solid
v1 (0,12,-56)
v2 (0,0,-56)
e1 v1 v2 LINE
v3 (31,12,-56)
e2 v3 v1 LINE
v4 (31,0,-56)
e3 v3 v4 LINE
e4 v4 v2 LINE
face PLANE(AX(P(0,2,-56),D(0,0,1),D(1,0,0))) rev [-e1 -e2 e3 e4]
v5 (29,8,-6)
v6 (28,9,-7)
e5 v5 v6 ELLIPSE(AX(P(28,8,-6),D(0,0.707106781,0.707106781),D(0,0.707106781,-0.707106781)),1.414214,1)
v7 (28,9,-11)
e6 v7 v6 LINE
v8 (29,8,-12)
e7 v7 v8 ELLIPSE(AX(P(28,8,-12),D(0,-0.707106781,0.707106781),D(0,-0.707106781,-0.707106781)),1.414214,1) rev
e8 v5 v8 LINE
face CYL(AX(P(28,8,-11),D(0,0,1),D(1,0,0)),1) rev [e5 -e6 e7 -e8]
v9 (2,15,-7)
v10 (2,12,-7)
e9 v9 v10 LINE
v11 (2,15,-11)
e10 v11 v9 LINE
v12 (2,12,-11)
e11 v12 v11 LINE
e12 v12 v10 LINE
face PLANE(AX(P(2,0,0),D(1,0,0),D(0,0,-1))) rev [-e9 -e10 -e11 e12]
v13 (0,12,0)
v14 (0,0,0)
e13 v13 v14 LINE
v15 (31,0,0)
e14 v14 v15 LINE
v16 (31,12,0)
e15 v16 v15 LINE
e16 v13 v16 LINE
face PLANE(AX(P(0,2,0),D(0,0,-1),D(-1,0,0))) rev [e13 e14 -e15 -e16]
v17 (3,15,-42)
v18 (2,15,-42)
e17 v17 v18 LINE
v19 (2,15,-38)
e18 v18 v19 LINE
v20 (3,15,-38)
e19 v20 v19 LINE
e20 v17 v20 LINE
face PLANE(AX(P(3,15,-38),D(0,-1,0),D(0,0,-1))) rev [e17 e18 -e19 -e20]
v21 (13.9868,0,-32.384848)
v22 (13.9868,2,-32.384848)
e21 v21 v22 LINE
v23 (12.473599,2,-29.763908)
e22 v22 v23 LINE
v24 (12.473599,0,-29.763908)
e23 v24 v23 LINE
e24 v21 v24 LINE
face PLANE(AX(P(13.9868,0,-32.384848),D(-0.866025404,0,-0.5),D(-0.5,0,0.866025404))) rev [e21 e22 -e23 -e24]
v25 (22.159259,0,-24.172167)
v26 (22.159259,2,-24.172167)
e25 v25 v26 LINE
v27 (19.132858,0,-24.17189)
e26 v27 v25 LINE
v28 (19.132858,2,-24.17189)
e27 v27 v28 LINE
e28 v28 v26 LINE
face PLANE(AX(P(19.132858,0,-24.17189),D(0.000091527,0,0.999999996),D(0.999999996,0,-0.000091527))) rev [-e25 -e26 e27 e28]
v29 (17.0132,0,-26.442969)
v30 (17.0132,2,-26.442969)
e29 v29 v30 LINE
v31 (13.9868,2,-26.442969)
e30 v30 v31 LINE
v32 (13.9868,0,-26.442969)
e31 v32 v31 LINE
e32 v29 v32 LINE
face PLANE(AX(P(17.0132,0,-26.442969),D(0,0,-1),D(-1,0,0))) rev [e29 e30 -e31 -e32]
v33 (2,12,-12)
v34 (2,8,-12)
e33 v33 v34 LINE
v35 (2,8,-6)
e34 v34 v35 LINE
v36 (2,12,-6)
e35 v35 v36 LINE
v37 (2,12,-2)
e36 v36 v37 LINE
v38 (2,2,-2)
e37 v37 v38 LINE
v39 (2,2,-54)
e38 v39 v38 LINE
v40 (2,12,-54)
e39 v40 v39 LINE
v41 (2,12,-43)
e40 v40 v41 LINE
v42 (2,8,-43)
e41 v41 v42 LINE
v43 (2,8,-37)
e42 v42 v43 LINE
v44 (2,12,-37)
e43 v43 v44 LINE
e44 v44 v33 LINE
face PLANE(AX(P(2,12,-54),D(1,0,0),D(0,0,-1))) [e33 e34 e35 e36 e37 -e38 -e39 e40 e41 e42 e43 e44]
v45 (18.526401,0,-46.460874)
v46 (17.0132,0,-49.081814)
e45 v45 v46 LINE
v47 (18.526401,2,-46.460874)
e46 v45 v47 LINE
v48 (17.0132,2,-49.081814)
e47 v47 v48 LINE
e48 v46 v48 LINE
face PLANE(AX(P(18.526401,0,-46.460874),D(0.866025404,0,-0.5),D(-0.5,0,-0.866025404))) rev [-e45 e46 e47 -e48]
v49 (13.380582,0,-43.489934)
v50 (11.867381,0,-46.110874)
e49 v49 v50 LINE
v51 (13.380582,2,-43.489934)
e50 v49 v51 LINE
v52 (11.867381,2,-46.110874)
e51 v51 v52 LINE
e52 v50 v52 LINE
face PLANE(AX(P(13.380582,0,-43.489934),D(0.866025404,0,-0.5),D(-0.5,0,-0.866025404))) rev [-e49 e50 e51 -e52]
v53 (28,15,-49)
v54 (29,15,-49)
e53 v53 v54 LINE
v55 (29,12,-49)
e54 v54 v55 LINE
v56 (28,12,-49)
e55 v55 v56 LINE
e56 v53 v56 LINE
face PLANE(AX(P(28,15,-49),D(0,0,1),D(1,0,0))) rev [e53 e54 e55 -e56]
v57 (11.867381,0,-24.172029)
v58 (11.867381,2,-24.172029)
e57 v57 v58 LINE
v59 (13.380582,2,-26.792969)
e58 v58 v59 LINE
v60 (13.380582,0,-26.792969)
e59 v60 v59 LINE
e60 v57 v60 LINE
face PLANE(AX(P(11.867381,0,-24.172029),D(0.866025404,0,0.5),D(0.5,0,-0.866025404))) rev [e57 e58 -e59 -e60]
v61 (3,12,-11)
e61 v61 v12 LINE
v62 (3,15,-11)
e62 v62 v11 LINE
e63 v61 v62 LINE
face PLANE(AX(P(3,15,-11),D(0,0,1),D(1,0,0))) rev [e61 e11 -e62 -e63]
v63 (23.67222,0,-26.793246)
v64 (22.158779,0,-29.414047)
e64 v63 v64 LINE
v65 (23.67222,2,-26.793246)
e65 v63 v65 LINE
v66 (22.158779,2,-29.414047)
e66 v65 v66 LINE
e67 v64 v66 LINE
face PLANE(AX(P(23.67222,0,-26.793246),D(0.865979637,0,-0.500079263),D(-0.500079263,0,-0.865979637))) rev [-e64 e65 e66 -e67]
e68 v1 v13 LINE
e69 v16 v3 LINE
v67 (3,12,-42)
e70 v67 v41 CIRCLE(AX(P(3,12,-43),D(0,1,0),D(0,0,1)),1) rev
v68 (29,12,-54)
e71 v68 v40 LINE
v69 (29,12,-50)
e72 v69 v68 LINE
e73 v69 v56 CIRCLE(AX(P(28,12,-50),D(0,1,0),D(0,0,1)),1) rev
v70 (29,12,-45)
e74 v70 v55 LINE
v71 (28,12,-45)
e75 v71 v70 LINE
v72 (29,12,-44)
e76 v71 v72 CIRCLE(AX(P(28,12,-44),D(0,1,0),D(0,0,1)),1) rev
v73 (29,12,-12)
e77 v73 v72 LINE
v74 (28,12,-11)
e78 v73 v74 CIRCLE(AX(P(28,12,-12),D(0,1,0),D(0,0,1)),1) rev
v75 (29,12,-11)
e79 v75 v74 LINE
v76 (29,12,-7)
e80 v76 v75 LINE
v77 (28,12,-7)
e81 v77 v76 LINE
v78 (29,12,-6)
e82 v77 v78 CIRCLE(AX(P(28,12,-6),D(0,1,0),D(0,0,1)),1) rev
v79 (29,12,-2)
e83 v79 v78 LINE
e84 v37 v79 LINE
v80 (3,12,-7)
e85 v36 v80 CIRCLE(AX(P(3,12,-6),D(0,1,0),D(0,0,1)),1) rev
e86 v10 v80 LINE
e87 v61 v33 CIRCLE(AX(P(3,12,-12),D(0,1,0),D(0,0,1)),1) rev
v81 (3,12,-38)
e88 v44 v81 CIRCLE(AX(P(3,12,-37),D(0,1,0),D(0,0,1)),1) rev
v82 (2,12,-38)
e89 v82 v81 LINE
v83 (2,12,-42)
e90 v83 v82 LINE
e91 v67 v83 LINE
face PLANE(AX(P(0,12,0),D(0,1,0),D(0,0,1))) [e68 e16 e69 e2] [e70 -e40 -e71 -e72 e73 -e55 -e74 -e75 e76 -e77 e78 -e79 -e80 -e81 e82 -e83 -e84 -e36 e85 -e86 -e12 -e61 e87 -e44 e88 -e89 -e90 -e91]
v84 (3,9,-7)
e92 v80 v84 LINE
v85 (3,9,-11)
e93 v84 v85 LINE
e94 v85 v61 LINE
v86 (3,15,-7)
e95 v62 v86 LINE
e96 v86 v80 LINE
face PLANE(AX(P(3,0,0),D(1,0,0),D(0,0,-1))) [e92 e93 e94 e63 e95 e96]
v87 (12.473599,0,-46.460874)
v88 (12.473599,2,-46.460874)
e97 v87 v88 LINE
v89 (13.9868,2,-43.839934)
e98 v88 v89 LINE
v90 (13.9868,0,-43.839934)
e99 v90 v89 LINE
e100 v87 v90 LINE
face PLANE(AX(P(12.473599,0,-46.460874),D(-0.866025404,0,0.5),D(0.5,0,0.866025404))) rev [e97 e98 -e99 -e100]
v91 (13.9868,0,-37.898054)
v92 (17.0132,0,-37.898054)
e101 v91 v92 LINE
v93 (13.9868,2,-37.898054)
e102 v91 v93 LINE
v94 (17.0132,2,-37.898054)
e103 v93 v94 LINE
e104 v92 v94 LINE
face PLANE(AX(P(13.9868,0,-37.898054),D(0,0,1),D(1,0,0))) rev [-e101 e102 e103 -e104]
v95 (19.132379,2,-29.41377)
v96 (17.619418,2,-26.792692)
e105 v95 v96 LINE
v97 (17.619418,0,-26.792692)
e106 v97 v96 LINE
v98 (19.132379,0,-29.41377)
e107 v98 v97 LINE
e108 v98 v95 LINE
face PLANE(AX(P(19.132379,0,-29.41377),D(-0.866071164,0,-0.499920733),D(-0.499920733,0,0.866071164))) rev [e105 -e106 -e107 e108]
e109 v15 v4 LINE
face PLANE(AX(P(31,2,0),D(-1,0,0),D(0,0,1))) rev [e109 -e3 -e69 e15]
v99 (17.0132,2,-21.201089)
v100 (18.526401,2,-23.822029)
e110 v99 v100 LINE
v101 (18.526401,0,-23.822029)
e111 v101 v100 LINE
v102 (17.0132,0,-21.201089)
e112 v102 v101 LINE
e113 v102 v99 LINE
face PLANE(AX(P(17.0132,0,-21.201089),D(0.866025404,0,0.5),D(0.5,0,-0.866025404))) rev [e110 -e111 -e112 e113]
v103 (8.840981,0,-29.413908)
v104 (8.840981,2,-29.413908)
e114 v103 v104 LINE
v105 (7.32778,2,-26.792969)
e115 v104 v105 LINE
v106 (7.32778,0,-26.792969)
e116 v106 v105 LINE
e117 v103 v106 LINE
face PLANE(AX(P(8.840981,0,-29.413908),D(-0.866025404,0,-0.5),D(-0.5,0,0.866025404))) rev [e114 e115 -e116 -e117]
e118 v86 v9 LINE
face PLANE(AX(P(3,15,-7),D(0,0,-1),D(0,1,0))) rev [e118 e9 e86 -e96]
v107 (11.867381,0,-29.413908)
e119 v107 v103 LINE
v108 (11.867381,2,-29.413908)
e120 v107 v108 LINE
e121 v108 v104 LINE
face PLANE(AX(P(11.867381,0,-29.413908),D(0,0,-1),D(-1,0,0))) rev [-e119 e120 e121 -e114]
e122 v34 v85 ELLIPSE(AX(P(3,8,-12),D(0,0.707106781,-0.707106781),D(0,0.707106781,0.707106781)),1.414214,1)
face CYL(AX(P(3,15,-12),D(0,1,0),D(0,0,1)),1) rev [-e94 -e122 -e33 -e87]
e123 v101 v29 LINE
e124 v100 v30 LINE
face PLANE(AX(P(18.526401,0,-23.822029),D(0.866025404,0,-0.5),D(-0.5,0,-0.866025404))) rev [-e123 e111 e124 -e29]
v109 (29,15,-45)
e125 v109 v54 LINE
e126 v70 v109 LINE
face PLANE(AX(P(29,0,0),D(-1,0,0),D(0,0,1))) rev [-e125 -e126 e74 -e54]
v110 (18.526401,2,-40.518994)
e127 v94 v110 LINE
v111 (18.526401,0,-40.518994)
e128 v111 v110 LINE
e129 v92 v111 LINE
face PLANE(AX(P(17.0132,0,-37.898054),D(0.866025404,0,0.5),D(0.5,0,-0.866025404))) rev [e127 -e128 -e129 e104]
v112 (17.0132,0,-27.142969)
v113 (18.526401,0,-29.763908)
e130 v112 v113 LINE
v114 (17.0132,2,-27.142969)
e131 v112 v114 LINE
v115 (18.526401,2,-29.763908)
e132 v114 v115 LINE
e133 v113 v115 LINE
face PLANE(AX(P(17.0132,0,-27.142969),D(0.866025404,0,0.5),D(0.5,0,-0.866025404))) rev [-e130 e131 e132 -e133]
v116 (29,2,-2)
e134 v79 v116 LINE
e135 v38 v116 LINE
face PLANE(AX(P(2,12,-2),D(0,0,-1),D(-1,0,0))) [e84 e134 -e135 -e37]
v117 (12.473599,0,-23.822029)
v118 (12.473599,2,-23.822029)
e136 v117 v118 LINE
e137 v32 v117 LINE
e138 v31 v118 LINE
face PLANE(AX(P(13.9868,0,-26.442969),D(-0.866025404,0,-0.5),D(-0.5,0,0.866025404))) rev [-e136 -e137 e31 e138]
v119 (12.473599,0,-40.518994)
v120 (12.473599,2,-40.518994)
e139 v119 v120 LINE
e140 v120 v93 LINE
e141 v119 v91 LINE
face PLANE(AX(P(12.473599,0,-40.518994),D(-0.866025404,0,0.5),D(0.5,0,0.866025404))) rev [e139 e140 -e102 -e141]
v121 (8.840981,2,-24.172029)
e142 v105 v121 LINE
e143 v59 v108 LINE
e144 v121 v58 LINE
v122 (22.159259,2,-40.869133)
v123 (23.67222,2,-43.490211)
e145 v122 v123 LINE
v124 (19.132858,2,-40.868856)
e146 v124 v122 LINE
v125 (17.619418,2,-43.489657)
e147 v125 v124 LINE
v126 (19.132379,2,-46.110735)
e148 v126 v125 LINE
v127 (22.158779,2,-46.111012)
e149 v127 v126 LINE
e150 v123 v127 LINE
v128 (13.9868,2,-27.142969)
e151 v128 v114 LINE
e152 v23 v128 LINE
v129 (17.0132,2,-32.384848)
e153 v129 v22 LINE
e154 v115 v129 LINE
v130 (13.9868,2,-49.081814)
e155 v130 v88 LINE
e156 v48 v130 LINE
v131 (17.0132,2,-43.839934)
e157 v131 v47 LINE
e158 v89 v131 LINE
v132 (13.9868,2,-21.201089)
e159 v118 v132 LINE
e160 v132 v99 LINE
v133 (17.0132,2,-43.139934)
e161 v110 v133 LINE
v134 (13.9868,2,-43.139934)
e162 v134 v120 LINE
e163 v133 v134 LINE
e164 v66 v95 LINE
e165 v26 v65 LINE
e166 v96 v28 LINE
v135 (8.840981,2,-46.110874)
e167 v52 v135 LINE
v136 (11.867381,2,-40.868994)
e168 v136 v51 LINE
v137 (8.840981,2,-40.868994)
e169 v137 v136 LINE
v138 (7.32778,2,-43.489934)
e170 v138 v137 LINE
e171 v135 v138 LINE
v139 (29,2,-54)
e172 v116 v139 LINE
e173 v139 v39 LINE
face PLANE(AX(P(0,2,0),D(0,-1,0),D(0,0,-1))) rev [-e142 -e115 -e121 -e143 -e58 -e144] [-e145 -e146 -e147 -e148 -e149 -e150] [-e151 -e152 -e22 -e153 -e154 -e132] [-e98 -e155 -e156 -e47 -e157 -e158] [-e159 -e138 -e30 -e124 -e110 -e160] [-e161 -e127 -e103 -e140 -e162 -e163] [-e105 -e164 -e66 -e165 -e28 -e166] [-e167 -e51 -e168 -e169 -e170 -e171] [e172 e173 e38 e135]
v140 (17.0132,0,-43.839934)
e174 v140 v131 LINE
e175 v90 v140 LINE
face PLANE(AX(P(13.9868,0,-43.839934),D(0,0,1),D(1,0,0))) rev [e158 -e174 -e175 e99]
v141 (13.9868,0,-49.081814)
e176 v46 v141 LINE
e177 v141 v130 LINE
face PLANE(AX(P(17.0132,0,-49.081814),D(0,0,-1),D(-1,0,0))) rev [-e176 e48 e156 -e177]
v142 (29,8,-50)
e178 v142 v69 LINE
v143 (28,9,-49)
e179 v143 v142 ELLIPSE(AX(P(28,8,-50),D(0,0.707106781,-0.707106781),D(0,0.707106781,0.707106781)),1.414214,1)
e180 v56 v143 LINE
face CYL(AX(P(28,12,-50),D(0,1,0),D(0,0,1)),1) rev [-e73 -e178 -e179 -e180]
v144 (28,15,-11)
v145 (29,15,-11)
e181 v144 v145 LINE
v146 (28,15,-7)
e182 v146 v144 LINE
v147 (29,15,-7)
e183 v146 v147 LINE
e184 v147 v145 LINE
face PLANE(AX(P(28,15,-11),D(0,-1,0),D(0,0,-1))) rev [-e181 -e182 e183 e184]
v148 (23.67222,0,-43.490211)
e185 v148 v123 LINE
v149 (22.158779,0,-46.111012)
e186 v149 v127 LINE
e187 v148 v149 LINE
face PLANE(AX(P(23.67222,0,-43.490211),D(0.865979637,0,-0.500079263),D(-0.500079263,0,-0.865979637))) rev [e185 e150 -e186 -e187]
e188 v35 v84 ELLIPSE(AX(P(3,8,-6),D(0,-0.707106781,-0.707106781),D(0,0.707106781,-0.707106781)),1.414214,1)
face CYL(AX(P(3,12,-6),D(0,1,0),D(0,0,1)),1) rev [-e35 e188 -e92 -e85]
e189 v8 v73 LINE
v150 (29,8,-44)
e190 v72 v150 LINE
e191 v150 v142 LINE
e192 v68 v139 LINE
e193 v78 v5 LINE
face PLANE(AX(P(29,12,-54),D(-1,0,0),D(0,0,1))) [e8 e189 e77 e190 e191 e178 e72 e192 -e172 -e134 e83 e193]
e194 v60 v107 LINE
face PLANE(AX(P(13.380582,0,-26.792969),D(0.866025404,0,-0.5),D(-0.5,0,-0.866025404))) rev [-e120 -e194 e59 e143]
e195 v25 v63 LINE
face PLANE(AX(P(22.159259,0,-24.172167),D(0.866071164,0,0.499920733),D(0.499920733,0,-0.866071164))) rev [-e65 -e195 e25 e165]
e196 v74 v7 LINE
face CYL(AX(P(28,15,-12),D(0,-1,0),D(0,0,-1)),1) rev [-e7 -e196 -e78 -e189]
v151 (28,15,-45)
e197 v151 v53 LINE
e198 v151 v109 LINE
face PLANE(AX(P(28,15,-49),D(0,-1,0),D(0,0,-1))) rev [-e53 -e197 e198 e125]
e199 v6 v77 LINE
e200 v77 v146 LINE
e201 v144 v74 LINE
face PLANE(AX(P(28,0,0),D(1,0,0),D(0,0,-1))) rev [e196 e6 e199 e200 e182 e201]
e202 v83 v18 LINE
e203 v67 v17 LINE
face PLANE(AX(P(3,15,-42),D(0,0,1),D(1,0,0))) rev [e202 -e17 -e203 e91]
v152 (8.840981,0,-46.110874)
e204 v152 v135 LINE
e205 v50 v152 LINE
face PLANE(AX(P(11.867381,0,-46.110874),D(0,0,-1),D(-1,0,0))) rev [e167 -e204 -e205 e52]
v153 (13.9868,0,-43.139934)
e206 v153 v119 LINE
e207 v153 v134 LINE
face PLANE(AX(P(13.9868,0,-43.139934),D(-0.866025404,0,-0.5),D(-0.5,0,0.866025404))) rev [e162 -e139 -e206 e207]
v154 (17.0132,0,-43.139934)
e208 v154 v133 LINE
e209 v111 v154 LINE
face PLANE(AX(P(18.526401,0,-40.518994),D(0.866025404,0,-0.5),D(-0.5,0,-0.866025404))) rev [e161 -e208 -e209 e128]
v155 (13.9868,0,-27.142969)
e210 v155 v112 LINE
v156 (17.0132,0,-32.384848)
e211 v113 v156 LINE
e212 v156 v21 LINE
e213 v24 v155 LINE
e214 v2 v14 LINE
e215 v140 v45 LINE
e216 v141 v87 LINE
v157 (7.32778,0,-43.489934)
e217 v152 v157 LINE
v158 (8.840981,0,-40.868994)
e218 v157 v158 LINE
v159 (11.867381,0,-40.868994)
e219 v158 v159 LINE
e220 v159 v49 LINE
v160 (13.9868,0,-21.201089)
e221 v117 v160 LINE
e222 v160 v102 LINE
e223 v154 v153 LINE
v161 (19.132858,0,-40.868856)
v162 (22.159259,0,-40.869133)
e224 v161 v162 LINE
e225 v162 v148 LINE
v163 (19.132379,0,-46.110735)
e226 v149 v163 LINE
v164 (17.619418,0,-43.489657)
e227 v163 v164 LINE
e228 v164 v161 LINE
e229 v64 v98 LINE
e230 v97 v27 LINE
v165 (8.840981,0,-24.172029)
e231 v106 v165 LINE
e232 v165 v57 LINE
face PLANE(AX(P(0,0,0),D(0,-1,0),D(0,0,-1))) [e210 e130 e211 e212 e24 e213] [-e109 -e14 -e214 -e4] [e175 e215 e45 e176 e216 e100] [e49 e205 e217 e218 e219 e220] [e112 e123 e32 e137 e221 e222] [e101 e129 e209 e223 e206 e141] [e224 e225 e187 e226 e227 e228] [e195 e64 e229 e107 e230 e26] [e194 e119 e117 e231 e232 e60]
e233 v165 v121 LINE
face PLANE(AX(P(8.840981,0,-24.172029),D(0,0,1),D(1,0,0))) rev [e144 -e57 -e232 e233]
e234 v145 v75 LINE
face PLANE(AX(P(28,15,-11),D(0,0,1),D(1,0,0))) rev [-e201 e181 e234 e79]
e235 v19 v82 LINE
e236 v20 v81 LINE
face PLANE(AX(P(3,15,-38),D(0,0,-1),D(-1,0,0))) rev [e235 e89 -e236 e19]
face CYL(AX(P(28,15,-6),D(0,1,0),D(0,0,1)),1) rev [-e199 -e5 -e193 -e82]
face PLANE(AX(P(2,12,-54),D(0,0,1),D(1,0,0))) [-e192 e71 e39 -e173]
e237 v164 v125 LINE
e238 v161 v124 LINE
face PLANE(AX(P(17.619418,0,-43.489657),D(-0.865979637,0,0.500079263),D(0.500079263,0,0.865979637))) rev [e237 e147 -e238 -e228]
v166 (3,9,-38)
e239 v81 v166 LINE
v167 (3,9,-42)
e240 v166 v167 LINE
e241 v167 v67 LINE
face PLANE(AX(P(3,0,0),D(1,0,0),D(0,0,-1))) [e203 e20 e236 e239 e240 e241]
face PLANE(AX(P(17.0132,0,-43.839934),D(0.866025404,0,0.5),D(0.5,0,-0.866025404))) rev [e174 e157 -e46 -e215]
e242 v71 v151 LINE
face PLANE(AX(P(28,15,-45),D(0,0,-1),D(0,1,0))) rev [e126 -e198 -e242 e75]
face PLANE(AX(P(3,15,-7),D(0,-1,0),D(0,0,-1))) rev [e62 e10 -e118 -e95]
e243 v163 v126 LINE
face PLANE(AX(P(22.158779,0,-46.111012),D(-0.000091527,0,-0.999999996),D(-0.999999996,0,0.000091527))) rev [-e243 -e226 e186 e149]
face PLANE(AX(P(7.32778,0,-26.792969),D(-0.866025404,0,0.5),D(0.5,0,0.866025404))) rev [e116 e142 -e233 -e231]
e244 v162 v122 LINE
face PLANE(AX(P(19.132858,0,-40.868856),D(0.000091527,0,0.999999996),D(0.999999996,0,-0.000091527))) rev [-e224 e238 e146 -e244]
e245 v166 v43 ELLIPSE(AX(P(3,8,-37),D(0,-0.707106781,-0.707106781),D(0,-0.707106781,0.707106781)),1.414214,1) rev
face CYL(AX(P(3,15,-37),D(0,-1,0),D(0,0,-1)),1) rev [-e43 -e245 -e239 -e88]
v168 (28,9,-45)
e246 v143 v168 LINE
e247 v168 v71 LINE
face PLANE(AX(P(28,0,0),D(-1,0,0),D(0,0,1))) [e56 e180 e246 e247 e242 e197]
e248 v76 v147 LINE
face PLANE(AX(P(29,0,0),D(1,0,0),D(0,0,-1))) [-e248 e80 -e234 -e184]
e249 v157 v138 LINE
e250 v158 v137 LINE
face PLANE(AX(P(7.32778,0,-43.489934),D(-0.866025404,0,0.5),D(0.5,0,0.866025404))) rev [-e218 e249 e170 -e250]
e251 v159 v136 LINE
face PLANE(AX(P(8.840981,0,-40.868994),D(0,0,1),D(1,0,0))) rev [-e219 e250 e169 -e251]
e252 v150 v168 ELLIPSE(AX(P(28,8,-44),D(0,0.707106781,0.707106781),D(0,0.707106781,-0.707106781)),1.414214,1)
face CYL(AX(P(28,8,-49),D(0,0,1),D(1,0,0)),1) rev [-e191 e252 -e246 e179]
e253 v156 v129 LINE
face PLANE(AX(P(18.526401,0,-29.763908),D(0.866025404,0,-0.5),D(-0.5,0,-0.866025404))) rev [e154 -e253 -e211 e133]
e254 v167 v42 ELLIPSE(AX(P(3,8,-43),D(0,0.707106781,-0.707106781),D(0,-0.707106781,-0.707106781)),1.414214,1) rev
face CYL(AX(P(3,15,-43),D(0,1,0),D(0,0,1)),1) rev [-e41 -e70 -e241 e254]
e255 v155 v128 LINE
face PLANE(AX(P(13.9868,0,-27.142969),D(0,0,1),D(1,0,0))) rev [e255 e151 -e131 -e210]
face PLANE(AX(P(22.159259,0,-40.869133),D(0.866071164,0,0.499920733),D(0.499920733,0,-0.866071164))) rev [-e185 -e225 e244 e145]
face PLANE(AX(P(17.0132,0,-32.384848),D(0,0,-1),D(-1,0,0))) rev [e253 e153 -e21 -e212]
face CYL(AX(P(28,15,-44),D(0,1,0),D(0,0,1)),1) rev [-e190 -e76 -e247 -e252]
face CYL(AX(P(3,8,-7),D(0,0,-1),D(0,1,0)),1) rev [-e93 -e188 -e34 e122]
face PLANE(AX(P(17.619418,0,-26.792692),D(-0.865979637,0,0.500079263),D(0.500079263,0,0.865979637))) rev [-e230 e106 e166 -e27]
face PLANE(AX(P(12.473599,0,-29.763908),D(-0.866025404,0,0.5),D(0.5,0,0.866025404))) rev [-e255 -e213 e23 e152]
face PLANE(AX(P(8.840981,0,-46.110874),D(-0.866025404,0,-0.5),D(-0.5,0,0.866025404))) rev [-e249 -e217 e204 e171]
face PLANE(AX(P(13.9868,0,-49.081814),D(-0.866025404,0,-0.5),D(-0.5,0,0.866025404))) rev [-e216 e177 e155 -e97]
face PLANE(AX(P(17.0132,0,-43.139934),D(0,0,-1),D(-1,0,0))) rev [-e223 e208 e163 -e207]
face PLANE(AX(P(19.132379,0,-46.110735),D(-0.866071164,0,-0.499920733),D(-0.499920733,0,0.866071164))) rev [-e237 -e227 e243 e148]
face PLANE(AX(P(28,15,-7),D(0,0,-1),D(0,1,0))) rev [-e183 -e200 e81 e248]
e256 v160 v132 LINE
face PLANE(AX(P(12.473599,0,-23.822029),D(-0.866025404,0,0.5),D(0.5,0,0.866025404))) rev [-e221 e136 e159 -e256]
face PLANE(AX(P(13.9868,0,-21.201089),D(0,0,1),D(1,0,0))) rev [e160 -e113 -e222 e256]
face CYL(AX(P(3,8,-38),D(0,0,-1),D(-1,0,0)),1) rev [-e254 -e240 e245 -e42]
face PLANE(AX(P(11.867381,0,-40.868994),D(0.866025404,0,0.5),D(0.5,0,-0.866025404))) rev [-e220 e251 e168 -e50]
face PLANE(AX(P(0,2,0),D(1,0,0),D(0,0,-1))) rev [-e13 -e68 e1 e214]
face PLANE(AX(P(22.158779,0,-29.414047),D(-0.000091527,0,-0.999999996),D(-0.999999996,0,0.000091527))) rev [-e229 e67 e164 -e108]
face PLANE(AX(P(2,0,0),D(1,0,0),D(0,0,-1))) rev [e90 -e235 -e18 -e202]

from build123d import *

# Parameters (mm, degrees)
ESQUISSE1_W             = 31
ESQUISSE1_H             = 56
BOSS_EXTRU_1_DEPTH      = 2
ENL_V_MAT_EXTRU_1_DEPTH = 65.039050586
ESQUISSE6_W             = 31
ESQUISSE6_H             = 56
ESQUISSE6_W_2           = 27
ESQUISSE6_H_2           = 52
BOSS_EXTRU_3_DEPTH      = 10
ESQUISSE10_W            = 4
ESQUISSE10_H            = 6
BOSS_EXTRU_8_DEPTH      = 1
CONG_1_R                = 1
ESQUISSE11_W            = 4
ESQUISSE11_H            = 6
BOSS_EXTRU_11_DEPTH     = 1
CONG_2_R                = 1


with BuildPart() as part:
    # Esquisse1 → Boss.-Extru.1 (new body)
    with BuildSketch(Plane(origin=(0, 0, 0), x_dir=(1, 0, 0), z_dir=(0, 1, 0))):
        with Locations((15.5, 28)):
            Rectangle(ESQUISSE1_W, ESQUISSE1_H)
    extrude(amount=BOSS_EXTRU_1_DEPTH)

    # Esquisse2 → Enlèv. mat.-Extru.1 (cut, through all)
    with BuildSketch(Plane(origin=(0, 2, 0), x_dir=(1, 0, 0), z_dir=(0, 1, 0))):
        Polygon((13.380581824, 43.489934015), (11.867381431, 46.110873977), (8.840980645, 46.110873977), (7.327780252, 43.489934015), (8.840980645, 40.868994052), (11.867381431, 40.868994052), align=None)
        Polygon((13.380581824, 26.792968516), (11.867381431, 29.413908479), (8.840980645, 29.413908479), (7.327780252, 26.792968516), (8.840980645, 24.172028553), (11.867381431, 24.172028553), align=None)
        Polygon((18.526400786, 46.460873977), (17.013200393, 49.08181394), (13.986799607, 49.08181394), (12.473599214, 46.460873977), (13.986799607, 43.839934015), (17.013200393, 43.839934015), align=None)
        Polygon((18.526400786, 40.518994052), (17.013200393, 43.139934015), (13.986799607, 43.139934015), (12.473599214, 40.518994052), (13.986799607, 37.898054089), (17.013200393, 37.898054089), align=None)
        Polygon((23.672219675, 43.490211012), (22.158779402, 46.111012465), (19.132378628, 46.110735468), (17.619418128, 43.489657017), (19.132858402, 40.868855564), (22.159259175, 40.869132561), align=None)
        Polygon((18.526400786, 29.763908479), (17.013200393, 32.384848442), (13.986799607, 32.384848442), (12.473599214, 29.763908479), (13.986799607, 27.142968516), (17.013200393, 27.142968516), align=None)
        Polygon((18.526400786, 23.822028553), (17.013200393, 26.442968516), (13.986799607, 26.442968516), (12.473599214, 23.822028553), (13.986799607, 21.20108859), (17.013200393, 21.20108859), align=None)
        Polygon((23.672219675, 26.793245513), (22.158779402, 29.414046967), (19.132378628, 29.413769969), (17.619418128, 26.792691519), (19.132858402, 24.171890065), (22.159259175, 24.172167063), align=None)
    extrude(amount=-ENL_V_MAT_EXTRU_1_DEPTH, mode=Mode.SUBTRACT)

    # Esquisse6 → Boss.-Extru.3 (add)
    with BuildSketch(Plane(origin=(0, 2, 0), x_dir=(1, 0, 0), z_dir=(0, 1, 0))):
        with Locations((15.5, 28)):
            Rectangle(ESQUISSE6_W, ESQUISSE6_H)
        with Locations((15.5, 28)):
            Rectangle(ESQUISSE6_W_2, ESQUISSE6_H_2, mode=Mode.SUBTRACT)
    extrude(amount=BOSS_EXTRU_3_DEPTH)

    # Esquisse10 → Boss.-Extru.8 (add)
    with BuildSketch(Plane.ZY.offset(-29)):
        with Locations((-47, 12)):
            Rectangle(ESQUISSE10_W, ESQUISSE10_H)
        with Locations((-9, 12)):
            Rectangle(ESQUISSE10_W, ESQUISSE10_H)
    extrude(amount=BOSS_EXTRU_8_DEPTH)

    # Congé1
    cong_1_edges = [part.edges().sort_by_distance(p)[0] for p in [
        (29, 9, -9),
        (29, 10.5, -11),
        (29, 10.5, -7),
        (29, 9, -47),
        (29, 10.5, -45),
        (29, 10.5, -49),
    ]]
    fillet(cong_1_edges, radius=CONG_1_R - 0.0001)  # a hair under: the kernel refuses the full size

    # Esquisse11 → Boss.-Extru.11 (add)
    with BuildSketch(Plane(origin=(2, 0, 0), x_dir=(0, 0, -1), z_dir=(1, 0, 0))):
        with Locations((9, 12)):
            Rectangle(ESQUISSE11_W, ESQUISSE11_H)
        with Locations((40, 12)):
            Rectangle(ESQUISSE11_W, ESQUISSE11_H)
    extrude(amount=BOSS_EXTRU_11_DEPTH)

    # Congé2
    cong_2_edges = [part.edges().sort_by_distance(p)[0] for p in [
        (2, 10.5, -7),
        (2, 9, -9),
        (2, 10.5, -11),
        (2, 10.5, -42),
        (2, 9, -40),
        (2, 10.5, -38),
    ]]
    fillet(cong_2_edges, radius=CONG_2_R - 0.0001)  # a hair under: the kernel refuses the full size


solid = part.part
